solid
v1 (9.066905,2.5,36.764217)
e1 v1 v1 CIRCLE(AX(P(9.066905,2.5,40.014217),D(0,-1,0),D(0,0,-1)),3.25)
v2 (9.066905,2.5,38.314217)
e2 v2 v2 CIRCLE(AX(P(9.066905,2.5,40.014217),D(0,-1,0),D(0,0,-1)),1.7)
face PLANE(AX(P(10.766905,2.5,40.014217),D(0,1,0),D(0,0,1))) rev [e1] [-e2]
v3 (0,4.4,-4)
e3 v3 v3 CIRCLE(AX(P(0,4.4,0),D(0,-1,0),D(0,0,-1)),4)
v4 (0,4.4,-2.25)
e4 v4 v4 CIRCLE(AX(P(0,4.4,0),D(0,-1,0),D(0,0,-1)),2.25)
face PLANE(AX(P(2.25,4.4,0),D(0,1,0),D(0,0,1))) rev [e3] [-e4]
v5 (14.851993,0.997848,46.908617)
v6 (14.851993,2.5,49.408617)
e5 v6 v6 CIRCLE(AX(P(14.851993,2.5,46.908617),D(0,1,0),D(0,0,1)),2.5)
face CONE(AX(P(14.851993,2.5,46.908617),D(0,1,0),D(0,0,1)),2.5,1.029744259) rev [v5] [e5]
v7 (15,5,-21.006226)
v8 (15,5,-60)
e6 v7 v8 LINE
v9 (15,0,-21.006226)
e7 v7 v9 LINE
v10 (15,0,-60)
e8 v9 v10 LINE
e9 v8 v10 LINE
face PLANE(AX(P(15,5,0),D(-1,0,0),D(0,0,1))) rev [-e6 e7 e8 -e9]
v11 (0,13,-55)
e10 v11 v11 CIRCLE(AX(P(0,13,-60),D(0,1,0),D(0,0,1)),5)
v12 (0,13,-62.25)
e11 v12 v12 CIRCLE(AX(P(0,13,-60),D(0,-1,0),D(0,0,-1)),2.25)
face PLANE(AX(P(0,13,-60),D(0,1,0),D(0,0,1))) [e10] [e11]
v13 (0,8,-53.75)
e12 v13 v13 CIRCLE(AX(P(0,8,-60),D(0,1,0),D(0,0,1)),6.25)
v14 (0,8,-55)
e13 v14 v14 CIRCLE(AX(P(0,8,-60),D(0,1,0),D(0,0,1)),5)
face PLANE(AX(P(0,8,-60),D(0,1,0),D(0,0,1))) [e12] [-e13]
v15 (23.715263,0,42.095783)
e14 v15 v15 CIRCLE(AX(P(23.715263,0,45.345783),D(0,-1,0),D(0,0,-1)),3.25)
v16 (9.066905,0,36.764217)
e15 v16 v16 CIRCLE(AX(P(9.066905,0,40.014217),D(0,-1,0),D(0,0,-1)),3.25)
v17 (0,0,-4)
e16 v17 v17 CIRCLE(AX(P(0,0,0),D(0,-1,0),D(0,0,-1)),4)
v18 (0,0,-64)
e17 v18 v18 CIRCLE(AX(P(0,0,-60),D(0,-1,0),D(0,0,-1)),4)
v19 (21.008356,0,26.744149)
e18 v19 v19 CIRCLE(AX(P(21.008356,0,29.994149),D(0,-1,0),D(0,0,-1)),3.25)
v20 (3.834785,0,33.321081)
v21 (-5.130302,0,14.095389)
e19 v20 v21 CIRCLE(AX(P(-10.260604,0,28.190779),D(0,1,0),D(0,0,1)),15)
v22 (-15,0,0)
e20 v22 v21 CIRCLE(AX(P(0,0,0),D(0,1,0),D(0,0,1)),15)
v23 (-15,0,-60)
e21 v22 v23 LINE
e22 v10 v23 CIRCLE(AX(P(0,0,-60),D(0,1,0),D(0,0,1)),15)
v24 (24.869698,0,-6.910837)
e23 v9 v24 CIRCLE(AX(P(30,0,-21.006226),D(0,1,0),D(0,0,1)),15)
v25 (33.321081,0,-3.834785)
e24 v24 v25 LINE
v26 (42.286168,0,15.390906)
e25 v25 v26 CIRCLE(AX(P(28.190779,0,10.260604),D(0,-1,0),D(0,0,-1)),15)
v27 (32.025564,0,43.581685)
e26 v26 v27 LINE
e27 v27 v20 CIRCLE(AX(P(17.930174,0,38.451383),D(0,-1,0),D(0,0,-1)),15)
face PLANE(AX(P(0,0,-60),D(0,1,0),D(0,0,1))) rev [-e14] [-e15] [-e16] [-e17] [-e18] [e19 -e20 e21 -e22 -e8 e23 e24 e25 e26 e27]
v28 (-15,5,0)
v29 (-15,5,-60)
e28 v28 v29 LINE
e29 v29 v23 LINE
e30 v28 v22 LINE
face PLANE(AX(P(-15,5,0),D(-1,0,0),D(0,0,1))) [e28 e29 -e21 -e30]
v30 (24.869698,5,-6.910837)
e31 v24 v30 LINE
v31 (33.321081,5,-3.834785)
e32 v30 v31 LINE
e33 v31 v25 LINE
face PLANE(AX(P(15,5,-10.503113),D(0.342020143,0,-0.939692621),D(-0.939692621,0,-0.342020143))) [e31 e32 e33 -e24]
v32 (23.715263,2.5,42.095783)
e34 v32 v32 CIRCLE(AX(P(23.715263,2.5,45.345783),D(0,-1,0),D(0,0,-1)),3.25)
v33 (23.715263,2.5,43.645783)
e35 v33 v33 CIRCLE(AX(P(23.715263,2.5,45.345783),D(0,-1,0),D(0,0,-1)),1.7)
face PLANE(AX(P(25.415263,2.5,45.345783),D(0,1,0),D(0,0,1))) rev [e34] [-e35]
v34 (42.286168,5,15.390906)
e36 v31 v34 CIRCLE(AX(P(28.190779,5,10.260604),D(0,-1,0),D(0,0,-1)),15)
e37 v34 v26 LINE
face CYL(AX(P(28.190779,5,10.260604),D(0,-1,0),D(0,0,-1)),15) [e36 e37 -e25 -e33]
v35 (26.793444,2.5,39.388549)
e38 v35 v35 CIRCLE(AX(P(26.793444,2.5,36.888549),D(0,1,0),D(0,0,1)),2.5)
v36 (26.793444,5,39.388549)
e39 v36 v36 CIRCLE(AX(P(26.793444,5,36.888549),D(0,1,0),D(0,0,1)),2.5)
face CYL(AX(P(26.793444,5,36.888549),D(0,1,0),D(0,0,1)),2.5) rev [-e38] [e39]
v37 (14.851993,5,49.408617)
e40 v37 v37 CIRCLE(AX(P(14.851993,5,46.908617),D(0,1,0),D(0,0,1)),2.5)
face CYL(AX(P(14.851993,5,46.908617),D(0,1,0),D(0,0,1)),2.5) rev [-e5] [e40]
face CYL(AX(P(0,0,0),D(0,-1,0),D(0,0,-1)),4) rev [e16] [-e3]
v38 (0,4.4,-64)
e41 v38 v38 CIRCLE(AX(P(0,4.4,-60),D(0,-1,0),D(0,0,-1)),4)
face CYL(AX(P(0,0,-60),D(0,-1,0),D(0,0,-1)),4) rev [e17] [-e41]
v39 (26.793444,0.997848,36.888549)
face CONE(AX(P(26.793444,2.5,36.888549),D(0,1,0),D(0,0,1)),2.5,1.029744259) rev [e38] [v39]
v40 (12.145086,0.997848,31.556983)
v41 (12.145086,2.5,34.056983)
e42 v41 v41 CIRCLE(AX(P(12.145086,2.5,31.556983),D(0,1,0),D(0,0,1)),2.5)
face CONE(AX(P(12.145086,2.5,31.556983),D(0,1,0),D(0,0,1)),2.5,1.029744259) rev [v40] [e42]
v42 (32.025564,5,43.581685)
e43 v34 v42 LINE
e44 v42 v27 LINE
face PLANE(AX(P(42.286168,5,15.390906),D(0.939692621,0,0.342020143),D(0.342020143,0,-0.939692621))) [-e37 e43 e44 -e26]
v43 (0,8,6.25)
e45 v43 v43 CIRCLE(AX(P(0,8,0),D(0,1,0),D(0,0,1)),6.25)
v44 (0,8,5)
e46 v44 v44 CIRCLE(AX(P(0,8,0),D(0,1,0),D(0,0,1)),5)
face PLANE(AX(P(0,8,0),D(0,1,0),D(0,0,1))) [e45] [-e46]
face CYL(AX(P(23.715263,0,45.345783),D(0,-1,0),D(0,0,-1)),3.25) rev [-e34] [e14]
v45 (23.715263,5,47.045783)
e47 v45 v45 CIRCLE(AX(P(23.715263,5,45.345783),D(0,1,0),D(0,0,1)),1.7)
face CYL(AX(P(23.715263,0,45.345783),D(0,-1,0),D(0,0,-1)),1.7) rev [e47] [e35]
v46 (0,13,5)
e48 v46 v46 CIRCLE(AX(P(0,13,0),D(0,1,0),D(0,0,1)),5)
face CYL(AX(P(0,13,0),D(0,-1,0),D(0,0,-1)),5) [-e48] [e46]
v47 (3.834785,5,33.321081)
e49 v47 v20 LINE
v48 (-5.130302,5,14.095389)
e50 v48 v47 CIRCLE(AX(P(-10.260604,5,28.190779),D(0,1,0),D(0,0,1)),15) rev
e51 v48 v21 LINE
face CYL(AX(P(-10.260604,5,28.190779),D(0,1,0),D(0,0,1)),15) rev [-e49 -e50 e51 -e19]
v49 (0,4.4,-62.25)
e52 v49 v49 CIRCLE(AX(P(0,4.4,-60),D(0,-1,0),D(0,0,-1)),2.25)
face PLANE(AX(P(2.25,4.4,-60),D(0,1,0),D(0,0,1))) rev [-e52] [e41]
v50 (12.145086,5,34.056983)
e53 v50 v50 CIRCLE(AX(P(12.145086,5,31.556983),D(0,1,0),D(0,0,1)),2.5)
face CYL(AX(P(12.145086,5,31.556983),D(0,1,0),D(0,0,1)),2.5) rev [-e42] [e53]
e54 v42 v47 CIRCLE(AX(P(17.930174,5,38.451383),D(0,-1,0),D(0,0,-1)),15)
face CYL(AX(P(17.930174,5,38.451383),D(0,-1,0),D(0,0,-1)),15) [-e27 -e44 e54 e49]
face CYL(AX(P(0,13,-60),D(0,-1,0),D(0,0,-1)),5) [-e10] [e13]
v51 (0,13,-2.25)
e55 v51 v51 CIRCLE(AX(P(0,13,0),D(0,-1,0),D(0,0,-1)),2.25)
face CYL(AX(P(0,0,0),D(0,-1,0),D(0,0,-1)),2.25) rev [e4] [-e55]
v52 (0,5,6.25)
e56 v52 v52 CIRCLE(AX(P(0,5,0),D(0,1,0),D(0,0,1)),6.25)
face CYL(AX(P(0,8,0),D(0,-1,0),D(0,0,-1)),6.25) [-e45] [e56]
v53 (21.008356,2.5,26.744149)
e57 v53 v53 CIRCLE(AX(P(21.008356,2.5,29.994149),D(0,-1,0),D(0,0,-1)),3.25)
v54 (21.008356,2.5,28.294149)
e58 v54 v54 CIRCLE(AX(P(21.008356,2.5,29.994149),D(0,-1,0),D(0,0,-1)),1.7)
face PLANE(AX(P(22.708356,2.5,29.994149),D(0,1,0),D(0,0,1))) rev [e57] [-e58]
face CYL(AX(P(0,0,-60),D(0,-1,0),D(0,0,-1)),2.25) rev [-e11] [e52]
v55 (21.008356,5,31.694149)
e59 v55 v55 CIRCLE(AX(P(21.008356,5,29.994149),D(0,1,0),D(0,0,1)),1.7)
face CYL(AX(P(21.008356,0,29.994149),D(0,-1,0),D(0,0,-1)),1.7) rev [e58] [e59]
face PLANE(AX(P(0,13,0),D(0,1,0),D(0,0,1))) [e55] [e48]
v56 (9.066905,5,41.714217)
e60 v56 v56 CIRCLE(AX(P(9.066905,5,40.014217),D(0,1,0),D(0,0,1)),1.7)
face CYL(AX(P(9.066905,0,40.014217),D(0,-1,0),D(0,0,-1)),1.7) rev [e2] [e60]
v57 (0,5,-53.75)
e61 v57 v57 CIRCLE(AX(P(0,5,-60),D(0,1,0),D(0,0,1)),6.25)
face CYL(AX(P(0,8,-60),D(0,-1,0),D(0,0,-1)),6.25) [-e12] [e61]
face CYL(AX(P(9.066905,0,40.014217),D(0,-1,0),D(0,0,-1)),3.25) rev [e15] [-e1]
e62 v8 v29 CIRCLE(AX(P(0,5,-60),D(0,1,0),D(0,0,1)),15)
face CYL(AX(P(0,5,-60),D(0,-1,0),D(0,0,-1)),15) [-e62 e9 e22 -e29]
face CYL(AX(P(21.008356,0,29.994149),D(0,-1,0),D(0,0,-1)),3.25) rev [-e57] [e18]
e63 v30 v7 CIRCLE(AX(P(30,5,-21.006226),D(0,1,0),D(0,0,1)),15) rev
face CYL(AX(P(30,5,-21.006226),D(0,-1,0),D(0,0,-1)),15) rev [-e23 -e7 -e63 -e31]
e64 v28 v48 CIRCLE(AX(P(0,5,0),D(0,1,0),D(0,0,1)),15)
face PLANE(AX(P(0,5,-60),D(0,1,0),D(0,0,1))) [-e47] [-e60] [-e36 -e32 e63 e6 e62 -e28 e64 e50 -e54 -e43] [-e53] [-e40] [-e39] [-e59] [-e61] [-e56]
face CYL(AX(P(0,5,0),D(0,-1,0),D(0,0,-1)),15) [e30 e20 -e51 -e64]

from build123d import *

# Parameters (mm, degrees)
EXTRUDE_1_DEPTH              = 5
SKETCH_2_R                   = 6.25
EXTRUDE_2_DEPTH              = 3
SKETCH_3_R                   = 5
EXTRUDE_3_DEPTH              = 5
HOLE_WIZARD_M4_3_D           = 4.5
HOLE_WIZARD_M4_3_CBORE_D     = 8
HOLE_WIZARD_M4_3_CBORE_DEPTH = 4.4
EXTRUDE_4_DEPTH              = 5
EXTRUDE_5_DEPTH              = 5
HOLE_WIZARD_M4_2_D           = 4.5
HOLE_WIZARD_M4_2_CBORE_D     = 8
HOLE_WIZARD_M4_2_CBORE_DEPTH = 4.4
HOLE_WIZARD_M3_1_D           = 3.4
HOLE_WIZARD_M3_1_CBORE_D     = 6.5
HOLE_WIZARD_M3_1_CBORE_DEPTH = 2.5
PATTERN_CIRCULAR_1_COUNT     = 3
PATTERN_CIRCULAR_2_COUNT     = 3
FILLET_2_R                   = 15


with BuildPart() as part:
    # 스케치1 → 보스-돌출1 (new body)
    with BuildSketch(Plane(origin=(0, 0, 0), x_dir=(1, 0, 0), z_dir=(0, 1, 0))):
        with BuildLine():
            Line((-15, 0), (-15, 60))
            ThreePointArc((-15, 60), (0, 75), (15, 60))
            Line((15, 60), (15, 0))
            ThreePointArc((15, 0), (0, -15), (-15, 0))
        make_face()
    extrude(amount=EXTRUDE_1_DEPTH)

    # 스케치2 → 보스-돌출2 (add)
    with BuildSketch(Plane(origin=(0, 5, 0), x_dir=(1, 0, 0), z_dir=(0, 1, 0))):
        with Locations(Location((0, 60, 0), (0, 0, 270))):
            Circle(SKETCH_2_R)
        with Locations(Location((0, 0, 0), (0, 0, 270))):
            Circle(SKETCH_2_R)
    extrude(amount=EXTRUDE_2_DEPTH)

    # 스케치3 → 보스-돌출3 (add)
    with BuildSketch(Plane(origin=(0, 8, 0), x_dir=(1, 0, 0), z_dir=(0, 1, 0))):
        with Locations(Location((0, 60, 0), (0, 0, 270))):
            Circle(SKETCH_3_R)
        with Locations(Location((0, 0, 0), (0, 0, 270))):
            Circle(SKETCH_3_R)
    extrude(amount=EXTRUDE_3_DEPTH)

    # M4 육각 소켓 머리 캡 나사용 카운터보어3 (through all)
    with Locations(Plane(origin=(0, 0, 0), x_dir=(-1, 0, 0), z_dir=(0, -1, 0))):
        with Locations((0, 60), (0, -25)):
            CounterBoreHole(HOLE_WIZARD_M4_3_D / 2, HOLE_WIZARD_M4_3_CBORE_D / 2, HOLE_WIZARD_M4_3_CBORE_DEPTH)

    # 스케치8 → 보스-돌출4 (add)
    with BuildSketch(Plane.XZ):
        with BuildLine():
            Line((-5.13030215, 14.095389312), (23.060476474, 24.355993612))
            ThreePointArc((23.060476474, 24.355993612), (42.286167935, 15.39090645), (33.321080773, -3.834785012))
            Line((33.321080773, -3.834785012), (15, -10.503113073))
            Line((15, -10.503113073), (15, 0))
            ThreePointArc((15, 0), (8.603646545, 12.287280664), (-5.13030215, 14.095389312))
        make_face()
    extrude(amount=-EXTRUDE_4_DEPTH)

    # 스케치9 → 보스-돌출5 (add)
    with BuildSketch(Plane.XZ):
        with BuildLine():
            Line((14.095389312, 5.13030215), (3.834785012, 33.321080773))
            ThreePointArc((3.834785012, 33.321080773), (12.799872174, 52.546772235), (32.025563636, 43.581685073))
            Line((32.025563636, 43.581685073), (42.286167935, 15.39090645))
            ThreePointArc((42.286167935, 15.39090645), (33.321080773, -3.834785012), (14.095389312, 5.13030215))
        make_face()
    extrude(amount=-EXTRUDE_5_DEPTH)

    # M4 육각 소켓 머리 캡 나사용 카운터보어2 (through all)
    with Locations(Plane(origin=(0, 0, 0), x_dir=(-1, 0, 0), z_dir=(0, -1, 0))):
        with Locations((0, 0)):
            CounterBoreHole(HOLE_WIZARD_M4_2_D / 2, HOLE_WIZARD_M4_2_CBORE_D / 2, HOLE_WIZARD_M4_2_CBORE_DEPTH)

    # M3 육각 소켓 머리 캡 나사용 카운터보어1 (through all)
    with Locations(Plane(origin=(0, 0, 0), x_dir=(-1, 0, 0), z_dir=(0, -1, 0))):
        with Locations((-21.008355614, -29.994149336)):
            hole_wizard_m3_1 = CounterBoreHole(HOLE_WIZARD_M3_1_D / 2, HOLE_WIZARD_M3_1_CBORE_D / 2, HOLE_WIZARD_M3_1_CBORE_DEPTH)

    # 원형 패턴1: M3 육각 소켓 머리 캡 나사용 카운터보어1 ×3 about axis
    pattern_circular_1_axis = Axis((17.930174324, 0, 38.451382923), (0, 1, 0))
    for i in range(1, PATTERN_CIRCULAR_1_COUNT):
        add(hole_wizard_m3_1.rotate(pattern_circular_1_axis, i * 360 / PATTERN_CIRCULAR_1_COUNT), mode=Mode.SUBTRACT)

    # 스케치36 → Ø5.0mm 맞춤핀 구멍1 (revolve, cut)
    with BuildSketch(Plane(origin=(14.851993034, 5, 46.90861651), x_dir=(0, 0, 1), z_dir=(1, 0, 0))):
        Polygon((0, 0), (0, 4.002151548), (2.5, 2.5), (2.5, 0), align=None)
    f_5_0mm_1 = revolve(axis=Axis((14.851993034, 11.35, 46.90861651), (0, -1, 0)), mode=Mode.SUBTRACT)

    # 원형 패턴2: Ø5.0mm 맞춤핀 구멍1 ×3 about axis
    pattern_circular_2_axis = Axis((17.930174324, 0, 38.451382923), (0, 1, 0))
    for i in range(1, PATTERN_CIRCULAR_2_COUNT):
        add(f_5_0mm_1.rotate(pattern_circular_2_axis, i * 360 / PATTERN_CIRCULAR_2_COUNT), mode=Mode.SUBTRACT)

    # 필렛2
    fillet_2_edges = [part.edges().sort_by_distance(p)[0] for p in [
        (15, 2.5, -10.503113073),
        (8.965087162, 2.5, 19.225691462),
    ]]
    fillet(fillet_2_edges, radius=FILLET_2_R - 0.0001)  # a hair under: the kernel refuses the full size


solid = part.part
